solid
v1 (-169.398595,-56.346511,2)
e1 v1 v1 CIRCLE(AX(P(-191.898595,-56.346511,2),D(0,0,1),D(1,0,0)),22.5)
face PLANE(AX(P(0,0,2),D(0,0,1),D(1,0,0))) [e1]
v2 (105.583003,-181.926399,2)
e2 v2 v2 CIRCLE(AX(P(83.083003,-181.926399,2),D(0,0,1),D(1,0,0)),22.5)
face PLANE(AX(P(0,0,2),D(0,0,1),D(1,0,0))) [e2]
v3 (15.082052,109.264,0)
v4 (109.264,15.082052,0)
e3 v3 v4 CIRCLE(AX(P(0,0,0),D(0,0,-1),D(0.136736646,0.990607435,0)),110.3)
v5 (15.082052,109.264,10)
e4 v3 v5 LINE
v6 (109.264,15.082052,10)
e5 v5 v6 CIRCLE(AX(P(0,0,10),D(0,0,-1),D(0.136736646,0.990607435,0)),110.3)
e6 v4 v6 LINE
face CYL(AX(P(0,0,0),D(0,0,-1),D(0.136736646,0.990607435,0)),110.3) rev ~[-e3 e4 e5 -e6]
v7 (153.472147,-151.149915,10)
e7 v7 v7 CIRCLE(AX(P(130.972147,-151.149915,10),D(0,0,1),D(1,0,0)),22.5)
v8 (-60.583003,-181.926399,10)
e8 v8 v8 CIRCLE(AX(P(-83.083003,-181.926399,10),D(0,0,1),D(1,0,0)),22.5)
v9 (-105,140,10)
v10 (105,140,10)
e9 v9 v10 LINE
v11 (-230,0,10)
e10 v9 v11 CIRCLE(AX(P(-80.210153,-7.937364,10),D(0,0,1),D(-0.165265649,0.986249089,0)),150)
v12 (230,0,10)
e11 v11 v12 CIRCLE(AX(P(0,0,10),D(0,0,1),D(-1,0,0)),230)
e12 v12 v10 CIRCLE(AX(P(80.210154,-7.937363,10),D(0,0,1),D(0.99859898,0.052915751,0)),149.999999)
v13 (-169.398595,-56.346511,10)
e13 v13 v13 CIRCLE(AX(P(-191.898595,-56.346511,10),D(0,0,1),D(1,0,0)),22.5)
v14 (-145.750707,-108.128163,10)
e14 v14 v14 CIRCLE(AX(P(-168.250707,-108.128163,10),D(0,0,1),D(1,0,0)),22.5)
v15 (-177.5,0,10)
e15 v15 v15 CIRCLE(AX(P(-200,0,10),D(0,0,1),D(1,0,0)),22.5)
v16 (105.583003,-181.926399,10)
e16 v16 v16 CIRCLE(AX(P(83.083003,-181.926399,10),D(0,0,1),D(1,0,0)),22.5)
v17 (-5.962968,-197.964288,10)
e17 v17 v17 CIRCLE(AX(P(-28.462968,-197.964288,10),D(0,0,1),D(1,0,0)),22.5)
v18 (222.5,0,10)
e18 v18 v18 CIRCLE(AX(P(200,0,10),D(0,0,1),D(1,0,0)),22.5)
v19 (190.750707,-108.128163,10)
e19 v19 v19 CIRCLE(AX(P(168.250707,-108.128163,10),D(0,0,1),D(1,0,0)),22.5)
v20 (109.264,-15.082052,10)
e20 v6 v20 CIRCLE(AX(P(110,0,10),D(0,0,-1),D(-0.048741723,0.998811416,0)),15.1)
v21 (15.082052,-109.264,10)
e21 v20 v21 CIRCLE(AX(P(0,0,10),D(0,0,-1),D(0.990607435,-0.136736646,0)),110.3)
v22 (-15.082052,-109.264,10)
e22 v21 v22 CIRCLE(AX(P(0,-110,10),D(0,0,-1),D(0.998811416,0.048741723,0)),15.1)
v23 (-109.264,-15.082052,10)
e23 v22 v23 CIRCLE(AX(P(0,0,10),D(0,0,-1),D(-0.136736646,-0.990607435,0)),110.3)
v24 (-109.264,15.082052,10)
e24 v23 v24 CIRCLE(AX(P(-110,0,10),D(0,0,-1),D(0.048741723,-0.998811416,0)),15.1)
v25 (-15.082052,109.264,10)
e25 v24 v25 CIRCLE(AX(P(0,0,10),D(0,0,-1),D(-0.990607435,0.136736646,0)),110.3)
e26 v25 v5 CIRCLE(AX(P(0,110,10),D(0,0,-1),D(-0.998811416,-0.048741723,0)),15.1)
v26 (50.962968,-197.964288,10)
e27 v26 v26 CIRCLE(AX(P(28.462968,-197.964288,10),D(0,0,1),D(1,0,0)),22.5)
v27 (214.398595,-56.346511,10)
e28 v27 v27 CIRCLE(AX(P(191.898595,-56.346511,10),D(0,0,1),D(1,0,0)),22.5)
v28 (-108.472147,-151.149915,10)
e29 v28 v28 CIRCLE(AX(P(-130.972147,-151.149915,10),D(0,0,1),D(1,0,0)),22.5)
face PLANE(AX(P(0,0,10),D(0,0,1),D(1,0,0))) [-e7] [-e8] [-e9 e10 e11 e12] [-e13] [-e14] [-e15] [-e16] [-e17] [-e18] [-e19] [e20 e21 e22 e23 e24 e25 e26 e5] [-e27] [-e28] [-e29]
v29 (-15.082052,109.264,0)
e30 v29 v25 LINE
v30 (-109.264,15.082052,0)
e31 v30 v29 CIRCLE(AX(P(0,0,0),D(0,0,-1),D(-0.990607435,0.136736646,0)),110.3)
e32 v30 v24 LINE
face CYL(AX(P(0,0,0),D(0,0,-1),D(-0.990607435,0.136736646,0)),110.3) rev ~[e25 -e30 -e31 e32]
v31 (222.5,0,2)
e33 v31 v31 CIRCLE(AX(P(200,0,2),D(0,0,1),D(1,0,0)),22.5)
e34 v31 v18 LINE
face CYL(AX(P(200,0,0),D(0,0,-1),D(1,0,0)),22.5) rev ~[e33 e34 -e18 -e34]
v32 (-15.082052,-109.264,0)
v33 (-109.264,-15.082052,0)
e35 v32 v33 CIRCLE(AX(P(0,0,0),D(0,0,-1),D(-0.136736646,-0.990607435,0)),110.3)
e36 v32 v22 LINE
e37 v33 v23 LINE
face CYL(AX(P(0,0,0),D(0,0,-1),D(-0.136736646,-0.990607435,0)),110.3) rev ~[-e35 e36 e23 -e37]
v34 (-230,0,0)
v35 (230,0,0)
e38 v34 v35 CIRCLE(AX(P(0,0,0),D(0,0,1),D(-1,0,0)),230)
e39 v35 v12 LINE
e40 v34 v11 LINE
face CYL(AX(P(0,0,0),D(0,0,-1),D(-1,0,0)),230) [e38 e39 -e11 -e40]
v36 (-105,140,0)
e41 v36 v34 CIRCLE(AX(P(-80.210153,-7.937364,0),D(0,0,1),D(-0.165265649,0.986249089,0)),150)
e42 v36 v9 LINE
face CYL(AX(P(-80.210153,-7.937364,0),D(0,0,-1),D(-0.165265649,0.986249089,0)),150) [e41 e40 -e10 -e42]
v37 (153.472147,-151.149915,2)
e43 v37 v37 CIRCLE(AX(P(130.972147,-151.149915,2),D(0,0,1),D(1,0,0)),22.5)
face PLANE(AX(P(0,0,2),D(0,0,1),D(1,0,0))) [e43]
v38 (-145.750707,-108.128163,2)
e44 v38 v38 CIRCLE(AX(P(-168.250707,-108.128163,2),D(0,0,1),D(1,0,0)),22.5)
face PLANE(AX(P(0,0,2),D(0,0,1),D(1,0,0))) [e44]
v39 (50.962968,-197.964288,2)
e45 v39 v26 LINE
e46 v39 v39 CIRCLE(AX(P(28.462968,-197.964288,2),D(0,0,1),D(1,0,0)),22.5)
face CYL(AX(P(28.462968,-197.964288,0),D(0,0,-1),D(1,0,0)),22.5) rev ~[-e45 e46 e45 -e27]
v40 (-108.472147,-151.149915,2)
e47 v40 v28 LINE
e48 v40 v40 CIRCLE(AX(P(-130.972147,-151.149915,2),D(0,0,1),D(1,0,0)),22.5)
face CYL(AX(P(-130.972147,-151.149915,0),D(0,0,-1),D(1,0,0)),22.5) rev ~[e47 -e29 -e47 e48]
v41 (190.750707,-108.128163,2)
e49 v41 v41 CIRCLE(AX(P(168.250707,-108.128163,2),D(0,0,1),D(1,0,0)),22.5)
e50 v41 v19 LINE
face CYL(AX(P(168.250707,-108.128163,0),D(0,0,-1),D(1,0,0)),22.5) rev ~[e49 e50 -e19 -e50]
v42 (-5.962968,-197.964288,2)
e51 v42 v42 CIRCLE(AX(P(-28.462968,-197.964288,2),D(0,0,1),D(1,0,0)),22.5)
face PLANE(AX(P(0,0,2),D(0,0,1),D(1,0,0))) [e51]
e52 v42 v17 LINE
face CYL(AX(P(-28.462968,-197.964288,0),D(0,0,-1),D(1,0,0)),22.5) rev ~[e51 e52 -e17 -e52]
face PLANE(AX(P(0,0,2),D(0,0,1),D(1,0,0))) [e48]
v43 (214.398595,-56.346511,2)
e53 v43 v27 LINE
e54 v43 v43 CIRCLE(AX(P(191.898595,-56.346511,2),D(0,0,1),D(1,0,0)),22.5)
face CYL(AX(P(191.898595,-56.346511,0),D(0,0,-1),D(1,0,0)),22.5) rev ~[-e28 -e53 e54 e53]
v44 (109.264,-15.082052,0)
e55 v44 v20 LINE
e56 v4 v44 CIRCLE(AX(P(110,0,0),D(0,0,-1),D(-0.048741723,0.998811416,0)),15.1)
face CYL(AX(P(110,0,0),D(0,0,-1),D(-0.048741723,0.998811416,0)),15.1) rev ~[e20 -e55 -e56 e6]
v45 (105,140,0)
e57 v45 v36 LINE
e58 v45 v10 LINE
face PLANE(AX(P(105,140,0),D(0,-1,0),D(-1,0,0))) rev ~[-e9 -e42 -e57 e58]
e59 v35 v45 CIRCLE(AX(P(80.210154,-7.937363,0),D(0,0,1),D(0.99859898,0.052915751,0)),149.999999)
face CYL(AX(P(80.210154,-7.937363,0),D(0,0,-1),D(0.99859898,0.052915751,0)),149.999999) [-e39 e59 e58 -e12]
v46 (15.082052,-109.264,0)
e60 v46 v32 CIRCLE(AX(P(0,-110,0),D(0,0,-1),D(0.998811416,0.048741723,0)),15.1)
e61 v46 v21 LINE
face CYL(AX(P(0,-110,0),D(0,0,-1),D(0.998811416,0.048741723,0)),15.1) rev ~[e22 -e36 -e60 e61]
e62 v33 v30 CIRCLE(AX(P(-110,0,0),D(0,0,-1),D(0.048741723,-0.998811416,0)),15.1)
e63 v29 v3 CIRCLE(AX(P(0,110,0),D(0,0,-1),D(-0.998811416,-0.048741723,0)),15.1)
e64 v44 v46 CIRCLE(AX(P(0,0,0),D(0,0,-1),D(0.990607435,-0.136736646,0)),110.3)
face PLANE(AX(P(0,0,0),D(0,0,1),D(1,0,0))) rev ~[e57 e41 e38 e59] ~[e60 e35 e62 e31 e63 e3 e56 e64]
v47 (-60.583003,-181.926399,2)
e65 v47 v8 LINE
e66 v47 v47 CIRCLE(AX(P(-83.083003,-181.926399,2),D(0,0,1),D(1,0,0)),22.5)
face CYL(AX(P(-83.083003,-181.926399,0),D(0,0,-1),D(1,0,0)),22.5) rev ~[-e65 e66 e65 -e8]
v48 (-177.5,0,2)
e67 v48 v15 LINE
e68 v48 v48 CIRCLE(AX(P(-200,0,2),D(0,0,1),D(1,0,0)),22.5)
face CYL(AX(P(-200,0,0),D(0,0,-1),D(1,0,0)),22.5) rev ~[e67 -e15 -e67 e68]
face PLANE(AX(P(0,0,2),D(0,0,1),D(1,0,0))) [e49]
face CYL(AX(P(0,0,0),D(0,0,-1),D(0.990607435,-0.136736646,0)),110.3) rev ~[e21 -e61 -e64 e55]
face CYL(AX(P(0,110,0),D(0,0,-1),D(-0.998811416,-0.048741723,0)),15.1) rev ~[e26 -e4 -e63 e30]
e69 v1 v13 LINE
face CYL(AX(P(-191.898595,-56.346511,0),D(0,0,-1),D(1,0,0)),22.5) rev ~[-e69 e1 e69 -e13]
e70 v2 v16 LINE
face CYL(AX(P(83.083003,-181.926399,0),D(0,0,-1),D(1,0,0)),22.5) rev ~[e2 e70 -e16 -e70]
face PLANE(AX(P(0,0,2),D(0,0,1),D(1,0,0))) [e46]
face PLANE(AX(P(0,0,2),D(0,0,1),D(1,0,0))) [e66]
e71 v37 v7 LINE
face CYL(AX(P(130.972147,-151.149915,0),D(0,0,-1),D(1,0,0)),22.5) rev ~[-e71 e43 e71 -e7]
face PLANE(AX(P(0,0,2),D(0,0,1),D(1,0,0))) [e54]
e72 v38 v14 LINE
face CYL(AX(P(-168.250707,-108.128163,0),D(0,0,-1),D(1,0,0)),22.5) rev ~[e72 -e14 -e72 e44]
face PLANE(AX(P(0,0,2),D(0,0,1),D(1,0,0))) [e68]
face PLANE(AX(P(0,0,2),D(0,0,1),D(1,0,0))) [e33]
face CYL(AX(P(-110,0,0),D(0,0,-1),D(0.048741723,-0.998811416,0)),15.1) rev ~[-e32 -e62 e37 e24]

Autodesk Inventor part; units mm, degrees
ref_plane "YZ Plane" through (0, 0, 0) normal (1, 0, 0) x (0, 1, 0)
ref_plane "XZ Plane" through (0, 0, 0) normal (0, 1, 0) x (-1, 0, 0)
ref_plane "XY Plane" through (0, 0, 0) normal (0, 0, 1) x (1, 0, 0)
sketch "Sketch1" plane through (0, 0, 0) normal (0, 0, 1) x (1, 0, 0)
  line L0 (0, 0) -> (-200, 0) construction
  circle A0 centre (-200, 0) radius 17.5
  circle A1 centre (-200, 0) radius 22.5
  line L1 (0, 0) -> (-191.898595, -56.346511) construction
  circle A2 centre (-191.898595, -56.346511) radius 17.5
  circle A3 centre (-191.898595, -56.346511) radius 22.5
  line L2 (0, 0) -> (-168.250707, -108.128163) construction
  circle A4 centre (-168.250707, -108.128163) radius 17.5
  circle A5 centre (-168.250707, -108.128163) radius 22.5
  line L3 (0, 0) -> (-130.972147, -151.149915) construction
  circle A6 centre (-130.972147, -151.149915) radius 17.5
  circle A7 centre (-130.972147, -151.149915) radius 22.5
  line L4 (0, 0) -> (-83.083003, -181.926399) construction
  circle A8 centre (-83.083003, -181.926399) radius 17.5
  circle A9 centre (-83.083003, -181.926399) radius 22.5
  line L5 (0, 0) -> (-28.462968, -197.964288) construction
  circle A10 centre (-28.462968, -197.964288) radius 17.5
  circle A11 centre (-28.462968, -197.964288) radius 22.5
  line L6 (0, 0) -> (28.462968, -197.964288) construction
  circle A12 centre (28.462968, -197.964288) radius 17.5
  circle A13 centre (28.462968, -197.964288) radius 22.5
  line L7 (0, 0) -> (83.083003, -181.926399) construction
  circle A14 centre (83.083003, -181.926399) radius 17.5
  circle A15 centre (83.083003, -181.926399) radius 22.5
  line L8 (0, 0) -> (130.972147, -151.149915) construction
  circle A16 centre (130.972147, -151.149915) radius 17.5
  circle A17 centre (130.972147, -151.149915) radius 22.5
  line L9 (0, 0) -> (168.250707, -108.128163) construction
  circle A18 centre (168.250707, -108.128163) radius 17.5
  circle A19 centre (168.250707, -108.128163) radius 22.5
  line L10 (0, 0) -> (191.898595, -56.346511) construction
  circle A20 centre (191.898595, -56.346511) radius 17.5
  circle A21 centre (191.898595, -56.346511) radius 22.5
  line L11 (0, 0) -> (200, 0) construction
  circle A22 centre (200, 0) radius 17.5
  circle A23 centre (200, 0) radius 22.5
  circle A24 centre (-200, 0) radius 0 construction
  circle A25 centre (200, 0) radius 0 construction
  arc A26 (-200, 0) -> (-200, 0) centre (-200, 0) ccw
  arc A27 (200, 0) -> (200, 0) centre (200, 0) ccw
  line L12 (0, 0) -> (-200, 0) construction
  circle A28 centre (0, 0) radius 110.3
  circle A29 centre (-110, 0) radius 15.1
  arc A30 (-230, 0) -> (230, 0) centre (0, 0) ccw
  line L13 (0, 0) -> (0, 140)
  line L14 (0, 140) -> (-105, 140)
  line L15 (0, 140) -> (105, 140)
  arc A31 (230, 0) -> (105, 140) centre (80.210153, -7.937363) ccw
  arc A32 (-105, 140) -> (-230, 0) centre (-80.210153, -7.937363) ccw
  circle A33 centre (0, -110) radius 15.1
  circle A34 centre (110, 0) radius 15.1
  circle A35 centre (0, 110) radius 15.1
  point P0 (-166.666667, 74.535599)
  point P1 (-109.264, -15.082052)
  point P2 (-109.264, 15.082052)
  point P3 (15.082052, 109.264)
  point P4 (109.264, 15.082052)
  point P5 (109.264, -15.082052)
  point P6 (15.082052, -109.264)
  point P7 (-15.082052, -109.264)
  point P8 (-15.082052, 109.264)
  dimension "d1" = 35
  dimension "d2" = 45
  dimension "d5" = 180
  dimension "d35" = 200
  dimension "d36" = 220.6
  dimension "d43" = 30.2
  dimension "d48" = 230
  dimension "d49" = 140
  dimension "d53" = 105
  dimension "d54" = 150
  dimension "d55" = 150
  dimension "d56" = 210
  dimension "d58" = 110
  dimension "d61" = 360
sketch "Sketch1 outline for Extrusion1" plane through (0, 0, 0) normal (0, 0, 1) x (1, 0, 0)
  line L0 (0, 140) -> (-105, 140)
  line L1 (105, 140) -> (0, 140)
  arc A0 (-105, 140) -> (-230, 0) centre (-80.210153, -7.937363) ccw
  arc A1 (230, 0) -> (105, 140) centre (80.210153, -7.937363) ccw
  arc A2 (-230, 0) -> (230, 0) centre (0, 0) ccw
  circle A3 centre (-130.972147, -151.149915) radius 22.5
  circle A4 centre (-83.083003, -181.926399) radius 22.5
  circle A5 centre (-28.462968, -197.964288) radius 22.5
  circle A6 centre (-168.250707, -108.128163) radius 22.5
  circle A7 centre (-191.898595, -56.346511) radius 22.5
  circle A8 centre (28.462968, -197.964288) radius 22.5
  circle A9 centre (83.083003, -181.926399) radius 22.5
  circle A10 centre (130.972147, -151.149915) radius 22.5
  circle A11 centre (168.250707, -108.128163) radius 22.5
  circle A12 centre (191.898595, -56.346511) radius 22.5
  circle A13 centre (-200, 0) radius 22.5
  arc A14 (-15.082052, 109.264) -> (15.082052, 109.264) centre (0, 110) cw
  arc A15 (-109.264, 15.082052) -> (-15.082052, 109.264) centre (0, 0) cw
  arc A16 (-109.264, -15.082052) -> (-109.264, 15.082052) centre (-110, 0) cw
  arc A17 (-15.082052, -109.264) -> (-109.264, -15.082052) centre (0, 0) cw
  arc A18 (15.082052, -109.264) -> (-15.082052, -109.264) centre (0, -110) cw
  arc A19 (109.264, -15.082052) -> (15.082052, -109.264) centre (0, 0) cw
  arc A20 (109.264, 15.082052) -> (109.264, -15.082052) centre (110, 0) cw
  arc A21 (15.082052, 109.264) -> (109.264, 15.082052) centre (0, 0) cw
  circle A22 centre (200, 0) radius 22.5
extrude "Extrusion1" add sketch "Sketch1 outline for Extrusion1" along normal blind 10
sketch "Sketch1 outline for Extrusion2" plane through (0, 0, 0) normal (0, 0, 1) x (1, 0, 0)
  circle A0 centre (-200, 0) radius 22.5
  circle A1 centre (-191.898595, -56.346511) radius 22.5
  circle A2 centre (-168.250707, -108.128163) radius 22.5
  circle A3 centre (-130.972147, -151.149915) radius 22.5
  circle A4 centre (-83.083003, -181.926399) radius 22.5
  circle A5 centre (-28.462968, -197.964288) radius 22.5
  circle A6 centre (28.462968, -197.964288) radius 22.5
  circle A7 centre (83.083003, -181.926399) radius 22.5
  circle A8 centre (130.972147, -151.149915) radius 22.5
  circle A9 centre (168.250707, -108.128163) radius 22.5
  circle A10 centre (191.898595, -56.346511) radius 22.5
  circle A11 centre (200, 0) radius 22.5
extrude "Extrusion2" add sketch "Sketch1 outline for Extrusion2" along normal blind 2
properties part number "BasePlate"
